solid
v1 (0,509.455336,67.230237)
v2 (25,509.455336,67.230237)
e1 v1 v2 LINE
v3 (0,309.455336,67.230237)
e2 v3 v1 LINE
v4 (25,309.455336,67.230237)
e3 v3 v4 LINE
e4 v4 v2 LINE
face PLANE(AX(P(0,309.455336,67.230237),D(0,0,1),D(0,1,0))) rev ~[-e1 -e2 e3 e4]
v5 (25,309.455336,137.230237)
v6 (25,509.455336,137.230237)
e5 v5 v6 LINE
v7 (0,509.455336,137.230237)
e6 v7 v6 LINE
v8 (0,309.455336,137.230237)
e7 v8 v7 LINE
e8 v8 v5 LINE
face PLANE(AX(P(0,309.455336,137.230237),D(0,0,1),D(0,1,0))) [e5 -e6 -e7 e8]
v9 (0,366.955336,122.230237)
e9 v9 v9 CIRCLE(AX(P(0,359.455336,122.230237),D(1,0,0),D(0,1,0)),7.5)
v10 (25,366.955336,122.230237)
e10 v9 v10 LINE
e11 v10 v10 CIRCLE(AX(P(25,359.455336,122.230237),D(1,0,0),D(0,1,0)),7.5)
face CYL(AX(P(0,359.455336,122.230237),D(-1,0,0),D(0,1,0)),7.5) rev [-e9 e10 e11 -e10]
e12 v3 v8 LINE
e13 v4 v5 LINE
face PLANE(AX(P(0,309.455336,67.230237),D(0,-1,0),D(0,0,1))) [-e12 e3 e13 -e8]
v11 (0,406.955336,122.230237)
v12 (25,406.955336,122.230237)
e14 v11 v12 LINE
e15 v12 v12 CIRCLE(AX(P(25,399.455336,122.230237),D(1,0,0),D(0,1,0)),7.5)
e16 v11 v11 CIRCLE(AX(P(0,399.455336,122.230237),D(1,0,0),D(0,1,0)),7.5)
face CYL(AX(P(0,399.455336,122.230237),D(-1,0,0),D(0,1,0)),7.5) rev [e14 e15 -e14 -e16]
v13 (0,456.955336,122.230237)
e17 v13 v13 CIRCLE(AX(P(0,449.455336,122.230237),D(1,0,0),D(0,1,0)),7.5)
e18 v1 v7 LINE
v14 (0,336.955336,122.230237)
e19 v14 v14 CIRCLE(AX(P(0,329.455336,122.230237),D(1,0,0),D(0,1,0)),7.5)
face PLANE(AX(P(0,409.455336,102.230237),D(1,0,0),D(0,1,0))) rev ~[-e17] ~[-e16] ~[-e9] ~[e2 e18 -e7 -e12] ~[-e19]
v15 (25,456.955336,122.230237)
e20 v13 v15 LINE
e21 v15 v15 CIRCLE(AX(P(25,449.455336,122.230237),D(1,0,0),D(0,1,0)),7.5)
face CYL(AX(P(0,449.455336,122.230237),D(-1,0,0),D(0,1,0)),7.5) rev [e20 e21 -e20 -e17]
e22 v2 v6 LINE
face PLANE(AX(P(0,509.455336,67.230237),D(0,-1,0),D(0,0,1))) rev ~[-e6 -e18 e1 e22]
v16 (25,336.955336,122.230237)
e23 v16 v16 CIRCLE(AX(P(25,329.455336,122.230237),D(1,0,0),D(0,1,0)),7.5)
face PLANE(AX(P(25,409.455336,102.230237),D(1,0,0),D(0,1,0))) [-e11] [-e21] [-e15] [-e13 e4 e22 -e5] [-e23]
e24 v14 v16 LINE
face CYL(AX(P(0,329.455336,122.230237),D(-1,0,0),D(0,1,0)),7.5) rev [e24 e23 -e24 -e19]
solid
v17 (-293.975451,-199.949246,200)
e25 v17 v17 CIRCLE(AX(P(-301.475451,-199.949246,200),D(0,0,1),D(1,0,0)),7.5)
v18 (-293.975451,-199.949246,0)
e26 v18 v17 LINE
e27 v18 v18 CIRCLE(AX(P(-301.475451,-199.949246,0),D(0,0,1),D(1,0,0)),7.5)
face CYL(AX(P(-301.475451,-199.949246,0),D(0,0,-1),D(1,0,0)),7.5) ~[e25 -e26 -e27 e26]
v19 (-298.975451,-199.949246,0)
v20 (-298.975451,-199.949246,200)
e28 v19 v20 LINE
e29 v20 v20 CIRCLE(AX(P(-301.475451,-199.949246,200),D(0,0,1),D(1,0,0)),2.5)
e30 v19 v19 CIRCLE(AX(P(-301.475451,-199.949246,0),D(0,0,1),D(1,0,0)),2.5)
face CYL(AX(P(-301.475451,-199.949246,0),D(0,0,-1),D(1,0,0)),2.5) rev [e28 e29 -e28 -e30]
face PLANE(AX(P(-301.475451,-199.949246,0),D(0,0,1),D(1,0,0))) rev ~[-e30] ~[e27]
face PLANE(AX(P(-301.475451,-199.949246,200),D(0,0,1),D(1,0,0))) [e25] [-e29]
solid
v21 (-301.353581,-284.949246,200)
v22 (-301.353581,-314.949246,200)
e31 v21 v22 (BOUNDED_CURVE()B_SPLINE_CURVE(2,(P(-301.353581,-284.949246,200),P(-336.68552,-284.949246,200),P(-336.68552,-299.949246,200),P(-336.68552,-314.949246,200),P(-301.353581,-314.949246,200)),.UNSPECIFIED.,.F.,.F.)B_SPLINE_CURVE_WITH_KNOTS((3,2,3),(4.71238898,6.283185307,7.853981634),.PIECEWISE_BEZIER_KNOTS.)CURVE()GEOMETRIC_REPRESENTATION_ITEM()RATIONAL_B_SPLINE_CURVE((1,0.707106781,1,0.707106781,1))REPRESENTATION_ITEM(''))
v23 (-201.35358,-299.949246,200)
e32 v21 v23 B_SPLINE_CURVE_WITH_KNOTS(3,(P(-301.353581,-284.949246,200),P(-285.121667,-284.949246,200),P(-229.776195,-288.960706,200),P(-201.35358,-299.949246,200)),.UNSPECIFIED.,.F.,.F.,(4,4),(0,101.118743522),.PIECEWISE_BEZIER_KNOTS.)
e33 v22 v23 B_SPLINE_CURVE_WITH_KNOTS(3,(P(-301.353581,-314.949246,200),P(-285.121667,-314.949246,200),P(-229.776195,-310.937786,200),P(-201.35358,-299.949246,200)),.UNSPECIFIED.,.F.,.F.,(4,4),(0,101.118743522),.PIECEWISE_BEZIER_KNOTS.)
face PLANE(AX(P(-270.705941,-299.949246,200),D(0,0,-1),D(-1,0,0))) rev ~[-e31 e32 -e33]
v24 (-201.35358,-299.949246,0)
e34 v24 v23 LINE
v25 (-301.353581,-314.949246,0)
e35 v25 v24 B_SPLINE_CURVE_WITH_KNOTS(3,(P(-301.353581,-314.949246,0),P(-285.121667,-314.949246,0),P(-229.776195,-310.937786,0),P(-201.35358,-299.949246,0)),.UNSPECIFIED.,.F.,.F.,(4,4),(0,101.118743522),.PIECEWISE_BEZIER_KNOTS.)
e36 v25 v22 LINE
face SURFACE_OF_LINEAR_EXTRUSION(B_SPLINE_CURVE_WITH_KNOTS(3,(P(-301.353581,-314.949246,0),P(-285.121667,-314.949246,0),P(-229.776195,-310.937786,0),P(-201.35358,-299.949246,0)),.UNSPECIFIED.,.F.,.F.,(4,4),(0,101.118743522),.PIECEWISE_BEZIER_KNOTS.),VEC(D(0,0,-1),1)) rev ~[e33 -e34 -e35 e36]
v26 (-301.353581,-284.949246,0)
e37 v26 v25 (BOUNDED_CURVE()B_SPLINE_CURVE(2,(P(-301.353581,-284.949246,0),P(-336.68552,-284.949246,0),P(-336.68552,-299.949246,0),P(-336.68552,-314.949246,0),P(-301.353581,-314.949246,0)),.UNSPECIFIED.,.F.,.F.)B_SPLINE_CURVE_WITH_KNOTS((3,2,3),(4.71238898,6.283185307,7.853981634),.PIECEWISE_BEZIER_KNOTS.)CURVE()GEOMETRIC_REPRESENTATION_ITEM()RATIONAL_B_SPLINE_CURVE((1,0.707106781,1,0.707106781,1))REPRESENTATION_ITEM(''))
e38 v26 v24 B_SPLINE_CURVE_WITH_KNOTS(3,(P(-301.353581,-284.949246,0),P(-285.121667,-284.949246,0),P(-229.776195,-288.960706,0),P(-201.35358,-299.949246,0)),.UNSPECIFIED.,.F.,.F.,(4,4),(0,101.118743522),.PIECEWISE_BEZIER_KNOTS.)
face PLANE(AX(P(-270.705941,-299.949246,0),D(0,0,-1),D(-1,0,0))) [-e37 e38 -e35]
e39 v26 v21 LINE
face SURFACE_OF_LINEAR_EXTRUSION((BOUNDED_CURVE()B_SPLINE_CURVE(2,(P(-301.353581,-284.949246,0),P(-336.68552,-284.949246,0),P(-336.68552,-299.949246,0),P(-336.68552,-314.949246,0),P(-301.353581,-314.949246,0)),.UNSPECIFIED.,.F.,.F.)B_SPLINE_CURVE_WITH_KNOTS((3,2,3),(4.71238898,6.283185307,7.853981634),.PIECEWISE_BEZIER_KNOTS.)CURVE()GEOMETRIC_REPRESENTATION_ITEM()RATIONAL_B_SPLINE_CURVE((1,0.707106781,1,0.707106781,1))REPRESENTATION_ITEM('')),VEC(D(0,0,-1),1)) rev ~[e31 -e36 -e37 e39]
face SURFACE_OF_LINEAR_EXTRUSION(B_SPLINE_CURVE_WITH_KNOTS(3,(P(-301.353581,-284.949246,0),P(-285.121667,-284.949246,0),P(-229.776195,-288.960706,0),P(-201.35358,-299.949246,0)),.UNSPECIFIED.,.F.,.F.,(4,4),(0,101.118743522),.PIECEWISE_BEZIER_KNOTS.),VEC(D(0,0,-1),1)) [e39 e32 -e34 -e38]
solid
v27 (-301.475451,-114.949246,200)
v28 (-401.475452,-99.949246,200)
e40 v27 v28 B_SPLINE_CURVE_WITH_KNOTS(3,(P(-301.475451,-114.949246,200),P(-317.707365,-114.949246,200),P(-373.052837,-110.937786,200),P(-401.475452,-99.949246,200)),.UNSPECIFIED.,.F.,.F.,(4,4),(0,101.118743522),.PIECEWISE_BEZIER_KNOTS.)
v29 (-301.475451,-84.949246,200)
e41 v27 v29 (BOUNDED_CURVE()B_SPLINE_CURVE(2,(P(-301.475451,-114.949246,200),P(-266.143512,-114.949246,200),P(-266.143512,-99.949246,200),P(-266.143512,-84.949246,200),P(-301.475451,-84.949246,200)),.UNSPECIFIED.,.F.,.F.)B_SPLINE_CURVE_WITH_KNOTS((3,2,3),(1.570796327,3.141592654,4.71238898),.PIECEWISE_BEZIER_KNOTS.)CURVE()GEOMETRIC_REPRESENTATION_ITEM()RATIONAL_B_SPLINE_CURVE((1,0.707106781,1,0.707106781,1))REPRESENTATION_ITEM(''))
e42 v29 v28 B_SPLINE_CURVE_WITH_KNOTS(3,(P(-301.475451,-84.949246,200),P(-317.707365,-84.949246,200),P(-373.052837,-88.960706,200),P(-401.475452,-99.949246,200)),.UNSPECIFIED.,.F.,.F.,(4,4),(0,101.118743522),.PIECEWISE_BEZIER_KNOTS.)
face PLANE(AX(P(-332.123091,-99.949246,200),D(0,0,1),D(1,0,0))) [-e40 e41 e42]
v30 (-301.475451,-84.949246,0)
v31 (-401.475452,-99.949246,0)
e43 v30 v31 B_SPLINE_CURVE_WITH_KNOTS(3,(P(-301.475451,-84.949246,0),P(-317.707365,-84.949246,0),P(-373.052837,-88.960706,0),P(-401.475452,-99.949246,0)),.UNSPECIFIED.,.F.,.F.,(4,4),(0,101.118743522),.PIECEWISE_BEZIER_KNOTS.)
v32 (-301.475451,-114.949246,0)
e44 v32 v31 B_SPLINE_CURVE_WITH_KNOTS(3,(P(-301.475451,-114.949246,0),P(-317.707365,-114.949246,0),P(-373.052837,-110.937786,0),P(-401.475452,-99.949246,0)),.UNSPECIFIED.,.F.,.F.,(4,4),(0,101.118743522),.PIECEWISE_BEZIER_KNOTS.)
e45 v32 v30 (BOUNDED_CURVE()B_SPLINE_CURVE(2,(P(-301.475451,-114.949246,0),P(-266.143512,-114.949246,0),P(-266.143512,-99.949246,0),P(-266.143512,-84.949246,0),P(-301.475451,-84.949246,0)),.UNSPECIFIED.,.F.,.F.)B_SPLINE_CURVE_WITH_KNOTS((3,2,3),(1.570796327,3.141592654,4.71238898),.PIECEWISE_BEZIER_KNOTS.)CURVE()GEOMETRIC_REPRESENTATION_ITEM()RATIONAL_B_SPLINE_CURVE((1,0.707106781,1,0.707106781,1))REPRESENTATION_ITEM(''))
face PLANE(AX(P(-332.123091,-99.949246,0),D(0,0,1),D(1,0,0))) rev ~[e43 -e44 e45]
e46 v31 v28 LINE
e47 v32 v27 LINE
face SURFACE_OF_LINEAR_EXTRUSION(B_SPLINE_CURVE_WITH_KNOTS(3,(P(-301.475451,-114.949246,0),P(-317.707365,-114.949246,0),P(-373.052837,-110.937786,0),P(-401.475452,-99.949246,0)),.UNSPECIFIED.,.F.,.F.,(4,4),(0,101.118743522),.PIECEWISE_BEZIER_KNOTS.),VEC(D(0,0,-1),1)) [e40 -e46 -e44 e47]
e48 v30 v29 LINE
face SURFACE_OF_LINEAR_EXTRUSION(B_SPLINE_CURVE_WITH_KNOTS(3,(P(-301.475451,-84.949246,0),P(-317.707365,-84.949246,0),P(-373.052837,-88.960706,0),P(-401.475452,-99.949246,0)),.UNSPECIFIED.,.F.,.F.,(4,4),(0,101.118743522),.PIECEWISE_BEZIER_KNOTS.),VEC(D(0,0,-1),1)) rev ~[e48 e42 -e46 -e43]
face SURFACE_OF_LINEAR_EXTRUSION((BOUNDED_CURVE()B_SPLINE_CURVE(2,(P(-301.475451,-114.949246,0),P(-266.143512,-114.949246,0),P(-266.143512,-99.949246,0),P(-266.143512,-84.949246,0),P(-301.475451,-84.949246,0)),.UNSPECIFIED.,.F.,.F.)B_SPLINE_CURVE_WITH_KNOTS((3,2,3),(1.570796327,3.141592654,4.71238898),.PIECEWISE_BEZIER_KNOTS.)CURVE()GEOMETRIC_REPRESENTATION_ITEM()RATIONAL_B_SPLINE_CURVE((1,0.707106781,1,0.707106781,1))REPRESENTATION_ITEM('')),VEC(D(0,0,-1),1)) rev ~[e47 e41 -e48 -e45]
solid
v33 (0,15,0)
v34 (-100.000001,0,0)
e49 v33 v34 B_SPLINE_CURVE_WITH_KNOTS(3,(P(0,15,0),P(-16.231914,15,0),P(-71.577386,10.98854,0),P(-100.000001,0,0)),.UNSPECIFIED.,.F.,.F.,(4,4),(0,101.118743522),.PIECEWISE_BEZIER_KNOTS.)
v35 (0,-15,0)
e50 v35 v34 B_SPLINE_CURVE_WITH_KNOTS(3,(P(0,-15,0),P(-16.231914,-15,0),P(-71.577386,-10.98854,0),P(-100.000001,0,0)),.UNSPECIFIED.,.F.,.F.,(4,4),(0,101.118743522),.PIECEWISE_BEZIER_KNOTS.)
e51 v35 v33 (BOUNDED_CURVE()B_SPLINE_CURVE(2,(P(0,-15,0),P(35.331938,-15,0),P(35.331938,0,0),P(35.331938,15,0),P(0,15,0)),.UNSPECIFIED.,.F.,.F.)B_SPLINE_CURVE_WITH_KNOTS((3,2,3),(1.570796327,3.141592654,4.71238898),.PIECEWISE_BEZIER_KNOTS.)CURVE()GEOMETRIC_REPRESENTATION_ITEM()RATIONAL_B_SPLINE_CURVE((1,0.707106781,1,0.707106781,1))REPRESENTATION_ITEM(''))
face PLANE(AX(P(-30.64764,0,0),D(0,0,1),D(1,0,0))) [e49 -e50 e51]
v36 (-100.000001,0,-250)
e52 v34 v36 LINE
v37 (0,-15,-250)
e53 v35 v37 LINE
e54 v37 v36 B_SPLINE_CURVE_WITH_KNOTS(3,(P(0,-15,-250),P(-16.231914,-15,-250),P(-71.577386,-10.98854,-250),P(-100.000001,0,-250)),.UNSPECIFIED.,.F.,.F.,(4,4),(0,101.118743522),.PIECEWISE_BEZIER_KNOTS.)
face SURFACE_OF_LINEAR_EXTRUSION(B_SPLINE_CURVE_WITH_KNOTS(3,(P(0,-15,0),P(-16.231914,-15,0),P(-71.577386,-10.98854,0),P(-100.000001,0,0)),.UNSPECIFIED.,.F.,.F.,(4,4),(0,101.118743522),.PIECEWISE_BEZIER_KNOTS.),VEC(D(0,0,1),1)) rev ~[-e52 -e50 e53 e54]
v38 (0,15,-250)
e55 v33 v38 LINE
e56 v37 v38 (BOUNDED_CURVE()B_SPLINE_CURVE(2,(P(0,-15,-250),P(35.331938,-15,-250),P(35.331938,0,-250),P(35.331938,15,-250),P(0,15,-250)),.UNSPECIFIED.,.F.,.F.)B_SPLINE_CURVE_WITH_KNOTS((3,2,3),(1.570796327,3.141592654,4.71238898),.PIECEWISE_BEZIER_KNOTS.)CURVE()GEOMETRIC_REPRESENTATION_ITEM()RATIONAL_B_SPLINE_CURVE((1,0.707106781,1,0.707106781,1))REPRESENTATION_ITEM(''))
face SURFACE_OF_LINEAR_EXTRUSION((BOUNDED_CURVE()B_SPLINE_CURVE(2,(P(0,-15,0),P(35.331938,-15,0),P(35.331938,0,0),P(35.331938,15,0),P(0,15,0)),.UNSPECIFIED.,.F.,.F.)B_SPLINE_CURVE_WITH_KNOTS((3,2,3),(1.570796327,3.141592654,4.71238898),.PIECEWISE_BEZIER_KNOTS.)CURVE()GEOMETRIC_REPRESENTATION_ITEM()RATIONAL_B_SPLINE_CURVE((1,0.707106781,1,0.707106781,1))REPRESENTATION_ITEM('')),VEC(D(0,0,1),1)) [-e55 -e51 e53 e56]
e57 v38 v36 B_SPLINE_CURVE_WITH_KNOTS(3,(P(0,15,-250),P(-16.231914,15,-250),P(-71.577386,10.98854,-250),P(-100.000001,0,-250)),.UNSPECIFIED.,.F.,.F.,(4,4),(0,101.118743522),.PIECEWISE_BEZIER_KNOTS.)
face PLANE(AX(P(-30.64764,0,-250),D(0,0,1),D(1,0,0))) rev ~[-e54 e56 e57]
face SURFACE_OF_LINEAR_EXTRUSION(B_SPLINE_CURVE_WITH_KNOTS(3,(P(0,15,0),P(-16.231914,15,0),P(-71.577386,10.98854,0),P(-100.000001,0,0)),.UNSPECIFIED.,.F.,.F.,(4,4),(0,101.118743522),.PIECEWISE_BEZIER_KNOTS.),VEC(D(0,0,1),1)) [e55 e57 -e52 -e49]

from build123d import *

# Parameters (mm, degrees)
F1_DEPTH = 250
F2_DEPTH = 200
F0_R     = 7.5
F0_R_2   = 2.5
F6_W     = 200
F6_H     = 70
F6_R     = 7.5
F7_DEPTH = 25


# Not quite as in the source:
# - ends of sketch curves that miss each other by under 0.0002 mm in the source are joined
# - the program builds the solid bodies; features that only make, move or delete a surface that nothing else refers to are left out


with BuildPart() as f1:
    # F0 (on Top) → F1 (new body)
    with BuildSketch(Plane.XY):
        with BuildLine():
            add(Edge.make_bspline(
                [(0, -15), (35.3319384158, -15), (35.3319384158, 0), (35.3319384158, 15), (0, 15)],
                knots=[1.5707963268, 1.5707963268, 1.5707963268, 3.1415926536, 3.1415926536, 4.7123889804, 4.7123889804, 4.7123889804], degree=2, weights=[1, 0.7071067812, 1, 0.7071067812, 1]))
            add(Edge.make_bspline(
                [(0, 15), (-16.2319140521, 15.0000000963), (-71.5773864947, 10.9885398261), (-100.0000014291, -1.909e-07)],
                knots=[0, 0, 0, 0, 101.1187435224, 101.1187435224, 101.1187435224, 101.1187435224], degree=3))
            add(Edge.make_bspline(
                [(0, -15), (-16.2319140521, -15.0000000963), (-71.5773864947, -10.9885398261), (-100.0000014291, -1.909e-07)],
                knots=[0, 0, 0, 0, 101.1187435224, 101.1187435224, 101.1187435224, 101.1187435224], degree=3))
        make_face()
    extrude(amount=-F1_DEPTH)


with BuildPart() as f2:
    # F0 (on Top) → F2 (new body)
    with BuildSketch(Plane.XY):
        with BuildLine():
            add(Edge.make_bspline(
                [(-301.4754507362, -114.9492457264), (-266.1435123205, -114.9492457264), (-266.1435123205, -99.9492457264), (-266.1435123205, -84.9492457264), (-301.4754507362, -84.9492457264)],
                knots=[1.5707963268, 1.5707963268, 1.5707963268, 3.1415926536, 3.1415926536, 4.7123889804, 4.7123889804, 4.7123889804], degree=2, weights=[1, 0.7071067812, 1, 0.7071067812, 1]))
            add(Edge.make_bspline(
                [(-301.4754507362, -84.9492457264), (-317.7073647883, -84.9492456301), (-373.0528372309, -88.9607059003), (-401.4754521653, -99.9492459173)],
                knots=[0, 0, 0, 0, 101.1187435224, 101.1187435224, 101.1187435224, 101.1187435224], degree=3))
            add(Edge.make_bspline(
                [(-301.4754507362, -114.9492457264), (-317.7073647883, -114.9492458228), (-373.0528372309, -110.9377855526), (-401.4754521653, -99.9492459173)],
                knots=[0, 0, 0, 0, 101.1187435224, 101.1187435224, 101.1187435224, 101.1187435224], degree=3))
        make_face()
    extrude(amount=F2_DEPTH)


with BuildPart() as f2b:
    # F0 (on Top) → F2, piece 2 (new body)
    with BuildSketch(Plane.XY):
        with BuildLine():
            add(Edge.make_bspline(
                [(-301.3535811887, -284.9492457264), (-285.1216671366, -284.9492456301), (-229.776194694, -288.9607059003), (-201.3535797596, -299.9492459173)],
                knots=[0, 0, 0, 0, 101.1187435224, 101.1187435224, 101.1187435224, 101.1187435224], degree=3))
            add(Edge.make_bspline(
                [(-301.3535811887, -284.9492457264), (-336.6855196045, -284.9492457264), (-336.6855196045, -299.9492457264), (-336.6855196045, -314.9492457264), (-301.3535811887, -314.9492457264)],
                knots=[4.7123889804, 4.7123889804, 4.7123889804, 6.2831853072, 6.2831853072, 7.853981634, 7.853981634, 7.853981634], degree=2, weights=[1, 0.7071067812, 1, 0.7071067812, 1]))
            add(Edge.make_bspline(
                [(-301.3535811887, -314.9492457264), (-285.1216671366, -314.9492458228), (-229.776194694, -310.9377855526), (-201.3535797596, -299.9492459173)],
                knots=[0, 0, 0, 0, 101.1187435224, 101.1187435224, 101.1187435224, 101.1187435224], degree=3))
        make_face()
    extrude(amount=F2_DEPTH)


with BuildPart() as f2c:
    # F0 (on Top) → F2, piece 3 (new body)
    with BuildSketch(Plane.XY):
        with Locations((-301.4754507362, -199.9492457264)):
            Circle(F0_R)
        with Locations((-301.4754507362, -199.9492457264)):
            Circle(F0_R_2, mode=Mode.SUBTRACT)
    extrude(amount=F2_DEPTH)


with BuildPart() as f7:
    # F6 (on Right) → F7 (new body)
    with BuildSketch(Plane.YZ):
        with Locations((409.4553355339, 102.2302365841)):
            Rectangle(F6_W, F6_H)
        with Locations((329.4553355339, 122.2302365841)):
            Circle(F6_R, mode=Mode.SUBTRACT)
        with Locations((359.4553355339, 122.2302365841)):
            Circle(F6_R, mode=Mode.SUBTRACT)
        with Locations((399.4553355339, 122.2302365841)):
            Circle(F6_R, mode=Mode.SUBTRACT)
        with Locations((449.4553355339, 122.2302365841)):
            Circle(F6_R, mode=Mode.SUBTRACT)
    extrude(amount=F7_DEPTH)


solid = Compound([f1.part, f2.part, f2b.part, f2c.part, f7.part])
